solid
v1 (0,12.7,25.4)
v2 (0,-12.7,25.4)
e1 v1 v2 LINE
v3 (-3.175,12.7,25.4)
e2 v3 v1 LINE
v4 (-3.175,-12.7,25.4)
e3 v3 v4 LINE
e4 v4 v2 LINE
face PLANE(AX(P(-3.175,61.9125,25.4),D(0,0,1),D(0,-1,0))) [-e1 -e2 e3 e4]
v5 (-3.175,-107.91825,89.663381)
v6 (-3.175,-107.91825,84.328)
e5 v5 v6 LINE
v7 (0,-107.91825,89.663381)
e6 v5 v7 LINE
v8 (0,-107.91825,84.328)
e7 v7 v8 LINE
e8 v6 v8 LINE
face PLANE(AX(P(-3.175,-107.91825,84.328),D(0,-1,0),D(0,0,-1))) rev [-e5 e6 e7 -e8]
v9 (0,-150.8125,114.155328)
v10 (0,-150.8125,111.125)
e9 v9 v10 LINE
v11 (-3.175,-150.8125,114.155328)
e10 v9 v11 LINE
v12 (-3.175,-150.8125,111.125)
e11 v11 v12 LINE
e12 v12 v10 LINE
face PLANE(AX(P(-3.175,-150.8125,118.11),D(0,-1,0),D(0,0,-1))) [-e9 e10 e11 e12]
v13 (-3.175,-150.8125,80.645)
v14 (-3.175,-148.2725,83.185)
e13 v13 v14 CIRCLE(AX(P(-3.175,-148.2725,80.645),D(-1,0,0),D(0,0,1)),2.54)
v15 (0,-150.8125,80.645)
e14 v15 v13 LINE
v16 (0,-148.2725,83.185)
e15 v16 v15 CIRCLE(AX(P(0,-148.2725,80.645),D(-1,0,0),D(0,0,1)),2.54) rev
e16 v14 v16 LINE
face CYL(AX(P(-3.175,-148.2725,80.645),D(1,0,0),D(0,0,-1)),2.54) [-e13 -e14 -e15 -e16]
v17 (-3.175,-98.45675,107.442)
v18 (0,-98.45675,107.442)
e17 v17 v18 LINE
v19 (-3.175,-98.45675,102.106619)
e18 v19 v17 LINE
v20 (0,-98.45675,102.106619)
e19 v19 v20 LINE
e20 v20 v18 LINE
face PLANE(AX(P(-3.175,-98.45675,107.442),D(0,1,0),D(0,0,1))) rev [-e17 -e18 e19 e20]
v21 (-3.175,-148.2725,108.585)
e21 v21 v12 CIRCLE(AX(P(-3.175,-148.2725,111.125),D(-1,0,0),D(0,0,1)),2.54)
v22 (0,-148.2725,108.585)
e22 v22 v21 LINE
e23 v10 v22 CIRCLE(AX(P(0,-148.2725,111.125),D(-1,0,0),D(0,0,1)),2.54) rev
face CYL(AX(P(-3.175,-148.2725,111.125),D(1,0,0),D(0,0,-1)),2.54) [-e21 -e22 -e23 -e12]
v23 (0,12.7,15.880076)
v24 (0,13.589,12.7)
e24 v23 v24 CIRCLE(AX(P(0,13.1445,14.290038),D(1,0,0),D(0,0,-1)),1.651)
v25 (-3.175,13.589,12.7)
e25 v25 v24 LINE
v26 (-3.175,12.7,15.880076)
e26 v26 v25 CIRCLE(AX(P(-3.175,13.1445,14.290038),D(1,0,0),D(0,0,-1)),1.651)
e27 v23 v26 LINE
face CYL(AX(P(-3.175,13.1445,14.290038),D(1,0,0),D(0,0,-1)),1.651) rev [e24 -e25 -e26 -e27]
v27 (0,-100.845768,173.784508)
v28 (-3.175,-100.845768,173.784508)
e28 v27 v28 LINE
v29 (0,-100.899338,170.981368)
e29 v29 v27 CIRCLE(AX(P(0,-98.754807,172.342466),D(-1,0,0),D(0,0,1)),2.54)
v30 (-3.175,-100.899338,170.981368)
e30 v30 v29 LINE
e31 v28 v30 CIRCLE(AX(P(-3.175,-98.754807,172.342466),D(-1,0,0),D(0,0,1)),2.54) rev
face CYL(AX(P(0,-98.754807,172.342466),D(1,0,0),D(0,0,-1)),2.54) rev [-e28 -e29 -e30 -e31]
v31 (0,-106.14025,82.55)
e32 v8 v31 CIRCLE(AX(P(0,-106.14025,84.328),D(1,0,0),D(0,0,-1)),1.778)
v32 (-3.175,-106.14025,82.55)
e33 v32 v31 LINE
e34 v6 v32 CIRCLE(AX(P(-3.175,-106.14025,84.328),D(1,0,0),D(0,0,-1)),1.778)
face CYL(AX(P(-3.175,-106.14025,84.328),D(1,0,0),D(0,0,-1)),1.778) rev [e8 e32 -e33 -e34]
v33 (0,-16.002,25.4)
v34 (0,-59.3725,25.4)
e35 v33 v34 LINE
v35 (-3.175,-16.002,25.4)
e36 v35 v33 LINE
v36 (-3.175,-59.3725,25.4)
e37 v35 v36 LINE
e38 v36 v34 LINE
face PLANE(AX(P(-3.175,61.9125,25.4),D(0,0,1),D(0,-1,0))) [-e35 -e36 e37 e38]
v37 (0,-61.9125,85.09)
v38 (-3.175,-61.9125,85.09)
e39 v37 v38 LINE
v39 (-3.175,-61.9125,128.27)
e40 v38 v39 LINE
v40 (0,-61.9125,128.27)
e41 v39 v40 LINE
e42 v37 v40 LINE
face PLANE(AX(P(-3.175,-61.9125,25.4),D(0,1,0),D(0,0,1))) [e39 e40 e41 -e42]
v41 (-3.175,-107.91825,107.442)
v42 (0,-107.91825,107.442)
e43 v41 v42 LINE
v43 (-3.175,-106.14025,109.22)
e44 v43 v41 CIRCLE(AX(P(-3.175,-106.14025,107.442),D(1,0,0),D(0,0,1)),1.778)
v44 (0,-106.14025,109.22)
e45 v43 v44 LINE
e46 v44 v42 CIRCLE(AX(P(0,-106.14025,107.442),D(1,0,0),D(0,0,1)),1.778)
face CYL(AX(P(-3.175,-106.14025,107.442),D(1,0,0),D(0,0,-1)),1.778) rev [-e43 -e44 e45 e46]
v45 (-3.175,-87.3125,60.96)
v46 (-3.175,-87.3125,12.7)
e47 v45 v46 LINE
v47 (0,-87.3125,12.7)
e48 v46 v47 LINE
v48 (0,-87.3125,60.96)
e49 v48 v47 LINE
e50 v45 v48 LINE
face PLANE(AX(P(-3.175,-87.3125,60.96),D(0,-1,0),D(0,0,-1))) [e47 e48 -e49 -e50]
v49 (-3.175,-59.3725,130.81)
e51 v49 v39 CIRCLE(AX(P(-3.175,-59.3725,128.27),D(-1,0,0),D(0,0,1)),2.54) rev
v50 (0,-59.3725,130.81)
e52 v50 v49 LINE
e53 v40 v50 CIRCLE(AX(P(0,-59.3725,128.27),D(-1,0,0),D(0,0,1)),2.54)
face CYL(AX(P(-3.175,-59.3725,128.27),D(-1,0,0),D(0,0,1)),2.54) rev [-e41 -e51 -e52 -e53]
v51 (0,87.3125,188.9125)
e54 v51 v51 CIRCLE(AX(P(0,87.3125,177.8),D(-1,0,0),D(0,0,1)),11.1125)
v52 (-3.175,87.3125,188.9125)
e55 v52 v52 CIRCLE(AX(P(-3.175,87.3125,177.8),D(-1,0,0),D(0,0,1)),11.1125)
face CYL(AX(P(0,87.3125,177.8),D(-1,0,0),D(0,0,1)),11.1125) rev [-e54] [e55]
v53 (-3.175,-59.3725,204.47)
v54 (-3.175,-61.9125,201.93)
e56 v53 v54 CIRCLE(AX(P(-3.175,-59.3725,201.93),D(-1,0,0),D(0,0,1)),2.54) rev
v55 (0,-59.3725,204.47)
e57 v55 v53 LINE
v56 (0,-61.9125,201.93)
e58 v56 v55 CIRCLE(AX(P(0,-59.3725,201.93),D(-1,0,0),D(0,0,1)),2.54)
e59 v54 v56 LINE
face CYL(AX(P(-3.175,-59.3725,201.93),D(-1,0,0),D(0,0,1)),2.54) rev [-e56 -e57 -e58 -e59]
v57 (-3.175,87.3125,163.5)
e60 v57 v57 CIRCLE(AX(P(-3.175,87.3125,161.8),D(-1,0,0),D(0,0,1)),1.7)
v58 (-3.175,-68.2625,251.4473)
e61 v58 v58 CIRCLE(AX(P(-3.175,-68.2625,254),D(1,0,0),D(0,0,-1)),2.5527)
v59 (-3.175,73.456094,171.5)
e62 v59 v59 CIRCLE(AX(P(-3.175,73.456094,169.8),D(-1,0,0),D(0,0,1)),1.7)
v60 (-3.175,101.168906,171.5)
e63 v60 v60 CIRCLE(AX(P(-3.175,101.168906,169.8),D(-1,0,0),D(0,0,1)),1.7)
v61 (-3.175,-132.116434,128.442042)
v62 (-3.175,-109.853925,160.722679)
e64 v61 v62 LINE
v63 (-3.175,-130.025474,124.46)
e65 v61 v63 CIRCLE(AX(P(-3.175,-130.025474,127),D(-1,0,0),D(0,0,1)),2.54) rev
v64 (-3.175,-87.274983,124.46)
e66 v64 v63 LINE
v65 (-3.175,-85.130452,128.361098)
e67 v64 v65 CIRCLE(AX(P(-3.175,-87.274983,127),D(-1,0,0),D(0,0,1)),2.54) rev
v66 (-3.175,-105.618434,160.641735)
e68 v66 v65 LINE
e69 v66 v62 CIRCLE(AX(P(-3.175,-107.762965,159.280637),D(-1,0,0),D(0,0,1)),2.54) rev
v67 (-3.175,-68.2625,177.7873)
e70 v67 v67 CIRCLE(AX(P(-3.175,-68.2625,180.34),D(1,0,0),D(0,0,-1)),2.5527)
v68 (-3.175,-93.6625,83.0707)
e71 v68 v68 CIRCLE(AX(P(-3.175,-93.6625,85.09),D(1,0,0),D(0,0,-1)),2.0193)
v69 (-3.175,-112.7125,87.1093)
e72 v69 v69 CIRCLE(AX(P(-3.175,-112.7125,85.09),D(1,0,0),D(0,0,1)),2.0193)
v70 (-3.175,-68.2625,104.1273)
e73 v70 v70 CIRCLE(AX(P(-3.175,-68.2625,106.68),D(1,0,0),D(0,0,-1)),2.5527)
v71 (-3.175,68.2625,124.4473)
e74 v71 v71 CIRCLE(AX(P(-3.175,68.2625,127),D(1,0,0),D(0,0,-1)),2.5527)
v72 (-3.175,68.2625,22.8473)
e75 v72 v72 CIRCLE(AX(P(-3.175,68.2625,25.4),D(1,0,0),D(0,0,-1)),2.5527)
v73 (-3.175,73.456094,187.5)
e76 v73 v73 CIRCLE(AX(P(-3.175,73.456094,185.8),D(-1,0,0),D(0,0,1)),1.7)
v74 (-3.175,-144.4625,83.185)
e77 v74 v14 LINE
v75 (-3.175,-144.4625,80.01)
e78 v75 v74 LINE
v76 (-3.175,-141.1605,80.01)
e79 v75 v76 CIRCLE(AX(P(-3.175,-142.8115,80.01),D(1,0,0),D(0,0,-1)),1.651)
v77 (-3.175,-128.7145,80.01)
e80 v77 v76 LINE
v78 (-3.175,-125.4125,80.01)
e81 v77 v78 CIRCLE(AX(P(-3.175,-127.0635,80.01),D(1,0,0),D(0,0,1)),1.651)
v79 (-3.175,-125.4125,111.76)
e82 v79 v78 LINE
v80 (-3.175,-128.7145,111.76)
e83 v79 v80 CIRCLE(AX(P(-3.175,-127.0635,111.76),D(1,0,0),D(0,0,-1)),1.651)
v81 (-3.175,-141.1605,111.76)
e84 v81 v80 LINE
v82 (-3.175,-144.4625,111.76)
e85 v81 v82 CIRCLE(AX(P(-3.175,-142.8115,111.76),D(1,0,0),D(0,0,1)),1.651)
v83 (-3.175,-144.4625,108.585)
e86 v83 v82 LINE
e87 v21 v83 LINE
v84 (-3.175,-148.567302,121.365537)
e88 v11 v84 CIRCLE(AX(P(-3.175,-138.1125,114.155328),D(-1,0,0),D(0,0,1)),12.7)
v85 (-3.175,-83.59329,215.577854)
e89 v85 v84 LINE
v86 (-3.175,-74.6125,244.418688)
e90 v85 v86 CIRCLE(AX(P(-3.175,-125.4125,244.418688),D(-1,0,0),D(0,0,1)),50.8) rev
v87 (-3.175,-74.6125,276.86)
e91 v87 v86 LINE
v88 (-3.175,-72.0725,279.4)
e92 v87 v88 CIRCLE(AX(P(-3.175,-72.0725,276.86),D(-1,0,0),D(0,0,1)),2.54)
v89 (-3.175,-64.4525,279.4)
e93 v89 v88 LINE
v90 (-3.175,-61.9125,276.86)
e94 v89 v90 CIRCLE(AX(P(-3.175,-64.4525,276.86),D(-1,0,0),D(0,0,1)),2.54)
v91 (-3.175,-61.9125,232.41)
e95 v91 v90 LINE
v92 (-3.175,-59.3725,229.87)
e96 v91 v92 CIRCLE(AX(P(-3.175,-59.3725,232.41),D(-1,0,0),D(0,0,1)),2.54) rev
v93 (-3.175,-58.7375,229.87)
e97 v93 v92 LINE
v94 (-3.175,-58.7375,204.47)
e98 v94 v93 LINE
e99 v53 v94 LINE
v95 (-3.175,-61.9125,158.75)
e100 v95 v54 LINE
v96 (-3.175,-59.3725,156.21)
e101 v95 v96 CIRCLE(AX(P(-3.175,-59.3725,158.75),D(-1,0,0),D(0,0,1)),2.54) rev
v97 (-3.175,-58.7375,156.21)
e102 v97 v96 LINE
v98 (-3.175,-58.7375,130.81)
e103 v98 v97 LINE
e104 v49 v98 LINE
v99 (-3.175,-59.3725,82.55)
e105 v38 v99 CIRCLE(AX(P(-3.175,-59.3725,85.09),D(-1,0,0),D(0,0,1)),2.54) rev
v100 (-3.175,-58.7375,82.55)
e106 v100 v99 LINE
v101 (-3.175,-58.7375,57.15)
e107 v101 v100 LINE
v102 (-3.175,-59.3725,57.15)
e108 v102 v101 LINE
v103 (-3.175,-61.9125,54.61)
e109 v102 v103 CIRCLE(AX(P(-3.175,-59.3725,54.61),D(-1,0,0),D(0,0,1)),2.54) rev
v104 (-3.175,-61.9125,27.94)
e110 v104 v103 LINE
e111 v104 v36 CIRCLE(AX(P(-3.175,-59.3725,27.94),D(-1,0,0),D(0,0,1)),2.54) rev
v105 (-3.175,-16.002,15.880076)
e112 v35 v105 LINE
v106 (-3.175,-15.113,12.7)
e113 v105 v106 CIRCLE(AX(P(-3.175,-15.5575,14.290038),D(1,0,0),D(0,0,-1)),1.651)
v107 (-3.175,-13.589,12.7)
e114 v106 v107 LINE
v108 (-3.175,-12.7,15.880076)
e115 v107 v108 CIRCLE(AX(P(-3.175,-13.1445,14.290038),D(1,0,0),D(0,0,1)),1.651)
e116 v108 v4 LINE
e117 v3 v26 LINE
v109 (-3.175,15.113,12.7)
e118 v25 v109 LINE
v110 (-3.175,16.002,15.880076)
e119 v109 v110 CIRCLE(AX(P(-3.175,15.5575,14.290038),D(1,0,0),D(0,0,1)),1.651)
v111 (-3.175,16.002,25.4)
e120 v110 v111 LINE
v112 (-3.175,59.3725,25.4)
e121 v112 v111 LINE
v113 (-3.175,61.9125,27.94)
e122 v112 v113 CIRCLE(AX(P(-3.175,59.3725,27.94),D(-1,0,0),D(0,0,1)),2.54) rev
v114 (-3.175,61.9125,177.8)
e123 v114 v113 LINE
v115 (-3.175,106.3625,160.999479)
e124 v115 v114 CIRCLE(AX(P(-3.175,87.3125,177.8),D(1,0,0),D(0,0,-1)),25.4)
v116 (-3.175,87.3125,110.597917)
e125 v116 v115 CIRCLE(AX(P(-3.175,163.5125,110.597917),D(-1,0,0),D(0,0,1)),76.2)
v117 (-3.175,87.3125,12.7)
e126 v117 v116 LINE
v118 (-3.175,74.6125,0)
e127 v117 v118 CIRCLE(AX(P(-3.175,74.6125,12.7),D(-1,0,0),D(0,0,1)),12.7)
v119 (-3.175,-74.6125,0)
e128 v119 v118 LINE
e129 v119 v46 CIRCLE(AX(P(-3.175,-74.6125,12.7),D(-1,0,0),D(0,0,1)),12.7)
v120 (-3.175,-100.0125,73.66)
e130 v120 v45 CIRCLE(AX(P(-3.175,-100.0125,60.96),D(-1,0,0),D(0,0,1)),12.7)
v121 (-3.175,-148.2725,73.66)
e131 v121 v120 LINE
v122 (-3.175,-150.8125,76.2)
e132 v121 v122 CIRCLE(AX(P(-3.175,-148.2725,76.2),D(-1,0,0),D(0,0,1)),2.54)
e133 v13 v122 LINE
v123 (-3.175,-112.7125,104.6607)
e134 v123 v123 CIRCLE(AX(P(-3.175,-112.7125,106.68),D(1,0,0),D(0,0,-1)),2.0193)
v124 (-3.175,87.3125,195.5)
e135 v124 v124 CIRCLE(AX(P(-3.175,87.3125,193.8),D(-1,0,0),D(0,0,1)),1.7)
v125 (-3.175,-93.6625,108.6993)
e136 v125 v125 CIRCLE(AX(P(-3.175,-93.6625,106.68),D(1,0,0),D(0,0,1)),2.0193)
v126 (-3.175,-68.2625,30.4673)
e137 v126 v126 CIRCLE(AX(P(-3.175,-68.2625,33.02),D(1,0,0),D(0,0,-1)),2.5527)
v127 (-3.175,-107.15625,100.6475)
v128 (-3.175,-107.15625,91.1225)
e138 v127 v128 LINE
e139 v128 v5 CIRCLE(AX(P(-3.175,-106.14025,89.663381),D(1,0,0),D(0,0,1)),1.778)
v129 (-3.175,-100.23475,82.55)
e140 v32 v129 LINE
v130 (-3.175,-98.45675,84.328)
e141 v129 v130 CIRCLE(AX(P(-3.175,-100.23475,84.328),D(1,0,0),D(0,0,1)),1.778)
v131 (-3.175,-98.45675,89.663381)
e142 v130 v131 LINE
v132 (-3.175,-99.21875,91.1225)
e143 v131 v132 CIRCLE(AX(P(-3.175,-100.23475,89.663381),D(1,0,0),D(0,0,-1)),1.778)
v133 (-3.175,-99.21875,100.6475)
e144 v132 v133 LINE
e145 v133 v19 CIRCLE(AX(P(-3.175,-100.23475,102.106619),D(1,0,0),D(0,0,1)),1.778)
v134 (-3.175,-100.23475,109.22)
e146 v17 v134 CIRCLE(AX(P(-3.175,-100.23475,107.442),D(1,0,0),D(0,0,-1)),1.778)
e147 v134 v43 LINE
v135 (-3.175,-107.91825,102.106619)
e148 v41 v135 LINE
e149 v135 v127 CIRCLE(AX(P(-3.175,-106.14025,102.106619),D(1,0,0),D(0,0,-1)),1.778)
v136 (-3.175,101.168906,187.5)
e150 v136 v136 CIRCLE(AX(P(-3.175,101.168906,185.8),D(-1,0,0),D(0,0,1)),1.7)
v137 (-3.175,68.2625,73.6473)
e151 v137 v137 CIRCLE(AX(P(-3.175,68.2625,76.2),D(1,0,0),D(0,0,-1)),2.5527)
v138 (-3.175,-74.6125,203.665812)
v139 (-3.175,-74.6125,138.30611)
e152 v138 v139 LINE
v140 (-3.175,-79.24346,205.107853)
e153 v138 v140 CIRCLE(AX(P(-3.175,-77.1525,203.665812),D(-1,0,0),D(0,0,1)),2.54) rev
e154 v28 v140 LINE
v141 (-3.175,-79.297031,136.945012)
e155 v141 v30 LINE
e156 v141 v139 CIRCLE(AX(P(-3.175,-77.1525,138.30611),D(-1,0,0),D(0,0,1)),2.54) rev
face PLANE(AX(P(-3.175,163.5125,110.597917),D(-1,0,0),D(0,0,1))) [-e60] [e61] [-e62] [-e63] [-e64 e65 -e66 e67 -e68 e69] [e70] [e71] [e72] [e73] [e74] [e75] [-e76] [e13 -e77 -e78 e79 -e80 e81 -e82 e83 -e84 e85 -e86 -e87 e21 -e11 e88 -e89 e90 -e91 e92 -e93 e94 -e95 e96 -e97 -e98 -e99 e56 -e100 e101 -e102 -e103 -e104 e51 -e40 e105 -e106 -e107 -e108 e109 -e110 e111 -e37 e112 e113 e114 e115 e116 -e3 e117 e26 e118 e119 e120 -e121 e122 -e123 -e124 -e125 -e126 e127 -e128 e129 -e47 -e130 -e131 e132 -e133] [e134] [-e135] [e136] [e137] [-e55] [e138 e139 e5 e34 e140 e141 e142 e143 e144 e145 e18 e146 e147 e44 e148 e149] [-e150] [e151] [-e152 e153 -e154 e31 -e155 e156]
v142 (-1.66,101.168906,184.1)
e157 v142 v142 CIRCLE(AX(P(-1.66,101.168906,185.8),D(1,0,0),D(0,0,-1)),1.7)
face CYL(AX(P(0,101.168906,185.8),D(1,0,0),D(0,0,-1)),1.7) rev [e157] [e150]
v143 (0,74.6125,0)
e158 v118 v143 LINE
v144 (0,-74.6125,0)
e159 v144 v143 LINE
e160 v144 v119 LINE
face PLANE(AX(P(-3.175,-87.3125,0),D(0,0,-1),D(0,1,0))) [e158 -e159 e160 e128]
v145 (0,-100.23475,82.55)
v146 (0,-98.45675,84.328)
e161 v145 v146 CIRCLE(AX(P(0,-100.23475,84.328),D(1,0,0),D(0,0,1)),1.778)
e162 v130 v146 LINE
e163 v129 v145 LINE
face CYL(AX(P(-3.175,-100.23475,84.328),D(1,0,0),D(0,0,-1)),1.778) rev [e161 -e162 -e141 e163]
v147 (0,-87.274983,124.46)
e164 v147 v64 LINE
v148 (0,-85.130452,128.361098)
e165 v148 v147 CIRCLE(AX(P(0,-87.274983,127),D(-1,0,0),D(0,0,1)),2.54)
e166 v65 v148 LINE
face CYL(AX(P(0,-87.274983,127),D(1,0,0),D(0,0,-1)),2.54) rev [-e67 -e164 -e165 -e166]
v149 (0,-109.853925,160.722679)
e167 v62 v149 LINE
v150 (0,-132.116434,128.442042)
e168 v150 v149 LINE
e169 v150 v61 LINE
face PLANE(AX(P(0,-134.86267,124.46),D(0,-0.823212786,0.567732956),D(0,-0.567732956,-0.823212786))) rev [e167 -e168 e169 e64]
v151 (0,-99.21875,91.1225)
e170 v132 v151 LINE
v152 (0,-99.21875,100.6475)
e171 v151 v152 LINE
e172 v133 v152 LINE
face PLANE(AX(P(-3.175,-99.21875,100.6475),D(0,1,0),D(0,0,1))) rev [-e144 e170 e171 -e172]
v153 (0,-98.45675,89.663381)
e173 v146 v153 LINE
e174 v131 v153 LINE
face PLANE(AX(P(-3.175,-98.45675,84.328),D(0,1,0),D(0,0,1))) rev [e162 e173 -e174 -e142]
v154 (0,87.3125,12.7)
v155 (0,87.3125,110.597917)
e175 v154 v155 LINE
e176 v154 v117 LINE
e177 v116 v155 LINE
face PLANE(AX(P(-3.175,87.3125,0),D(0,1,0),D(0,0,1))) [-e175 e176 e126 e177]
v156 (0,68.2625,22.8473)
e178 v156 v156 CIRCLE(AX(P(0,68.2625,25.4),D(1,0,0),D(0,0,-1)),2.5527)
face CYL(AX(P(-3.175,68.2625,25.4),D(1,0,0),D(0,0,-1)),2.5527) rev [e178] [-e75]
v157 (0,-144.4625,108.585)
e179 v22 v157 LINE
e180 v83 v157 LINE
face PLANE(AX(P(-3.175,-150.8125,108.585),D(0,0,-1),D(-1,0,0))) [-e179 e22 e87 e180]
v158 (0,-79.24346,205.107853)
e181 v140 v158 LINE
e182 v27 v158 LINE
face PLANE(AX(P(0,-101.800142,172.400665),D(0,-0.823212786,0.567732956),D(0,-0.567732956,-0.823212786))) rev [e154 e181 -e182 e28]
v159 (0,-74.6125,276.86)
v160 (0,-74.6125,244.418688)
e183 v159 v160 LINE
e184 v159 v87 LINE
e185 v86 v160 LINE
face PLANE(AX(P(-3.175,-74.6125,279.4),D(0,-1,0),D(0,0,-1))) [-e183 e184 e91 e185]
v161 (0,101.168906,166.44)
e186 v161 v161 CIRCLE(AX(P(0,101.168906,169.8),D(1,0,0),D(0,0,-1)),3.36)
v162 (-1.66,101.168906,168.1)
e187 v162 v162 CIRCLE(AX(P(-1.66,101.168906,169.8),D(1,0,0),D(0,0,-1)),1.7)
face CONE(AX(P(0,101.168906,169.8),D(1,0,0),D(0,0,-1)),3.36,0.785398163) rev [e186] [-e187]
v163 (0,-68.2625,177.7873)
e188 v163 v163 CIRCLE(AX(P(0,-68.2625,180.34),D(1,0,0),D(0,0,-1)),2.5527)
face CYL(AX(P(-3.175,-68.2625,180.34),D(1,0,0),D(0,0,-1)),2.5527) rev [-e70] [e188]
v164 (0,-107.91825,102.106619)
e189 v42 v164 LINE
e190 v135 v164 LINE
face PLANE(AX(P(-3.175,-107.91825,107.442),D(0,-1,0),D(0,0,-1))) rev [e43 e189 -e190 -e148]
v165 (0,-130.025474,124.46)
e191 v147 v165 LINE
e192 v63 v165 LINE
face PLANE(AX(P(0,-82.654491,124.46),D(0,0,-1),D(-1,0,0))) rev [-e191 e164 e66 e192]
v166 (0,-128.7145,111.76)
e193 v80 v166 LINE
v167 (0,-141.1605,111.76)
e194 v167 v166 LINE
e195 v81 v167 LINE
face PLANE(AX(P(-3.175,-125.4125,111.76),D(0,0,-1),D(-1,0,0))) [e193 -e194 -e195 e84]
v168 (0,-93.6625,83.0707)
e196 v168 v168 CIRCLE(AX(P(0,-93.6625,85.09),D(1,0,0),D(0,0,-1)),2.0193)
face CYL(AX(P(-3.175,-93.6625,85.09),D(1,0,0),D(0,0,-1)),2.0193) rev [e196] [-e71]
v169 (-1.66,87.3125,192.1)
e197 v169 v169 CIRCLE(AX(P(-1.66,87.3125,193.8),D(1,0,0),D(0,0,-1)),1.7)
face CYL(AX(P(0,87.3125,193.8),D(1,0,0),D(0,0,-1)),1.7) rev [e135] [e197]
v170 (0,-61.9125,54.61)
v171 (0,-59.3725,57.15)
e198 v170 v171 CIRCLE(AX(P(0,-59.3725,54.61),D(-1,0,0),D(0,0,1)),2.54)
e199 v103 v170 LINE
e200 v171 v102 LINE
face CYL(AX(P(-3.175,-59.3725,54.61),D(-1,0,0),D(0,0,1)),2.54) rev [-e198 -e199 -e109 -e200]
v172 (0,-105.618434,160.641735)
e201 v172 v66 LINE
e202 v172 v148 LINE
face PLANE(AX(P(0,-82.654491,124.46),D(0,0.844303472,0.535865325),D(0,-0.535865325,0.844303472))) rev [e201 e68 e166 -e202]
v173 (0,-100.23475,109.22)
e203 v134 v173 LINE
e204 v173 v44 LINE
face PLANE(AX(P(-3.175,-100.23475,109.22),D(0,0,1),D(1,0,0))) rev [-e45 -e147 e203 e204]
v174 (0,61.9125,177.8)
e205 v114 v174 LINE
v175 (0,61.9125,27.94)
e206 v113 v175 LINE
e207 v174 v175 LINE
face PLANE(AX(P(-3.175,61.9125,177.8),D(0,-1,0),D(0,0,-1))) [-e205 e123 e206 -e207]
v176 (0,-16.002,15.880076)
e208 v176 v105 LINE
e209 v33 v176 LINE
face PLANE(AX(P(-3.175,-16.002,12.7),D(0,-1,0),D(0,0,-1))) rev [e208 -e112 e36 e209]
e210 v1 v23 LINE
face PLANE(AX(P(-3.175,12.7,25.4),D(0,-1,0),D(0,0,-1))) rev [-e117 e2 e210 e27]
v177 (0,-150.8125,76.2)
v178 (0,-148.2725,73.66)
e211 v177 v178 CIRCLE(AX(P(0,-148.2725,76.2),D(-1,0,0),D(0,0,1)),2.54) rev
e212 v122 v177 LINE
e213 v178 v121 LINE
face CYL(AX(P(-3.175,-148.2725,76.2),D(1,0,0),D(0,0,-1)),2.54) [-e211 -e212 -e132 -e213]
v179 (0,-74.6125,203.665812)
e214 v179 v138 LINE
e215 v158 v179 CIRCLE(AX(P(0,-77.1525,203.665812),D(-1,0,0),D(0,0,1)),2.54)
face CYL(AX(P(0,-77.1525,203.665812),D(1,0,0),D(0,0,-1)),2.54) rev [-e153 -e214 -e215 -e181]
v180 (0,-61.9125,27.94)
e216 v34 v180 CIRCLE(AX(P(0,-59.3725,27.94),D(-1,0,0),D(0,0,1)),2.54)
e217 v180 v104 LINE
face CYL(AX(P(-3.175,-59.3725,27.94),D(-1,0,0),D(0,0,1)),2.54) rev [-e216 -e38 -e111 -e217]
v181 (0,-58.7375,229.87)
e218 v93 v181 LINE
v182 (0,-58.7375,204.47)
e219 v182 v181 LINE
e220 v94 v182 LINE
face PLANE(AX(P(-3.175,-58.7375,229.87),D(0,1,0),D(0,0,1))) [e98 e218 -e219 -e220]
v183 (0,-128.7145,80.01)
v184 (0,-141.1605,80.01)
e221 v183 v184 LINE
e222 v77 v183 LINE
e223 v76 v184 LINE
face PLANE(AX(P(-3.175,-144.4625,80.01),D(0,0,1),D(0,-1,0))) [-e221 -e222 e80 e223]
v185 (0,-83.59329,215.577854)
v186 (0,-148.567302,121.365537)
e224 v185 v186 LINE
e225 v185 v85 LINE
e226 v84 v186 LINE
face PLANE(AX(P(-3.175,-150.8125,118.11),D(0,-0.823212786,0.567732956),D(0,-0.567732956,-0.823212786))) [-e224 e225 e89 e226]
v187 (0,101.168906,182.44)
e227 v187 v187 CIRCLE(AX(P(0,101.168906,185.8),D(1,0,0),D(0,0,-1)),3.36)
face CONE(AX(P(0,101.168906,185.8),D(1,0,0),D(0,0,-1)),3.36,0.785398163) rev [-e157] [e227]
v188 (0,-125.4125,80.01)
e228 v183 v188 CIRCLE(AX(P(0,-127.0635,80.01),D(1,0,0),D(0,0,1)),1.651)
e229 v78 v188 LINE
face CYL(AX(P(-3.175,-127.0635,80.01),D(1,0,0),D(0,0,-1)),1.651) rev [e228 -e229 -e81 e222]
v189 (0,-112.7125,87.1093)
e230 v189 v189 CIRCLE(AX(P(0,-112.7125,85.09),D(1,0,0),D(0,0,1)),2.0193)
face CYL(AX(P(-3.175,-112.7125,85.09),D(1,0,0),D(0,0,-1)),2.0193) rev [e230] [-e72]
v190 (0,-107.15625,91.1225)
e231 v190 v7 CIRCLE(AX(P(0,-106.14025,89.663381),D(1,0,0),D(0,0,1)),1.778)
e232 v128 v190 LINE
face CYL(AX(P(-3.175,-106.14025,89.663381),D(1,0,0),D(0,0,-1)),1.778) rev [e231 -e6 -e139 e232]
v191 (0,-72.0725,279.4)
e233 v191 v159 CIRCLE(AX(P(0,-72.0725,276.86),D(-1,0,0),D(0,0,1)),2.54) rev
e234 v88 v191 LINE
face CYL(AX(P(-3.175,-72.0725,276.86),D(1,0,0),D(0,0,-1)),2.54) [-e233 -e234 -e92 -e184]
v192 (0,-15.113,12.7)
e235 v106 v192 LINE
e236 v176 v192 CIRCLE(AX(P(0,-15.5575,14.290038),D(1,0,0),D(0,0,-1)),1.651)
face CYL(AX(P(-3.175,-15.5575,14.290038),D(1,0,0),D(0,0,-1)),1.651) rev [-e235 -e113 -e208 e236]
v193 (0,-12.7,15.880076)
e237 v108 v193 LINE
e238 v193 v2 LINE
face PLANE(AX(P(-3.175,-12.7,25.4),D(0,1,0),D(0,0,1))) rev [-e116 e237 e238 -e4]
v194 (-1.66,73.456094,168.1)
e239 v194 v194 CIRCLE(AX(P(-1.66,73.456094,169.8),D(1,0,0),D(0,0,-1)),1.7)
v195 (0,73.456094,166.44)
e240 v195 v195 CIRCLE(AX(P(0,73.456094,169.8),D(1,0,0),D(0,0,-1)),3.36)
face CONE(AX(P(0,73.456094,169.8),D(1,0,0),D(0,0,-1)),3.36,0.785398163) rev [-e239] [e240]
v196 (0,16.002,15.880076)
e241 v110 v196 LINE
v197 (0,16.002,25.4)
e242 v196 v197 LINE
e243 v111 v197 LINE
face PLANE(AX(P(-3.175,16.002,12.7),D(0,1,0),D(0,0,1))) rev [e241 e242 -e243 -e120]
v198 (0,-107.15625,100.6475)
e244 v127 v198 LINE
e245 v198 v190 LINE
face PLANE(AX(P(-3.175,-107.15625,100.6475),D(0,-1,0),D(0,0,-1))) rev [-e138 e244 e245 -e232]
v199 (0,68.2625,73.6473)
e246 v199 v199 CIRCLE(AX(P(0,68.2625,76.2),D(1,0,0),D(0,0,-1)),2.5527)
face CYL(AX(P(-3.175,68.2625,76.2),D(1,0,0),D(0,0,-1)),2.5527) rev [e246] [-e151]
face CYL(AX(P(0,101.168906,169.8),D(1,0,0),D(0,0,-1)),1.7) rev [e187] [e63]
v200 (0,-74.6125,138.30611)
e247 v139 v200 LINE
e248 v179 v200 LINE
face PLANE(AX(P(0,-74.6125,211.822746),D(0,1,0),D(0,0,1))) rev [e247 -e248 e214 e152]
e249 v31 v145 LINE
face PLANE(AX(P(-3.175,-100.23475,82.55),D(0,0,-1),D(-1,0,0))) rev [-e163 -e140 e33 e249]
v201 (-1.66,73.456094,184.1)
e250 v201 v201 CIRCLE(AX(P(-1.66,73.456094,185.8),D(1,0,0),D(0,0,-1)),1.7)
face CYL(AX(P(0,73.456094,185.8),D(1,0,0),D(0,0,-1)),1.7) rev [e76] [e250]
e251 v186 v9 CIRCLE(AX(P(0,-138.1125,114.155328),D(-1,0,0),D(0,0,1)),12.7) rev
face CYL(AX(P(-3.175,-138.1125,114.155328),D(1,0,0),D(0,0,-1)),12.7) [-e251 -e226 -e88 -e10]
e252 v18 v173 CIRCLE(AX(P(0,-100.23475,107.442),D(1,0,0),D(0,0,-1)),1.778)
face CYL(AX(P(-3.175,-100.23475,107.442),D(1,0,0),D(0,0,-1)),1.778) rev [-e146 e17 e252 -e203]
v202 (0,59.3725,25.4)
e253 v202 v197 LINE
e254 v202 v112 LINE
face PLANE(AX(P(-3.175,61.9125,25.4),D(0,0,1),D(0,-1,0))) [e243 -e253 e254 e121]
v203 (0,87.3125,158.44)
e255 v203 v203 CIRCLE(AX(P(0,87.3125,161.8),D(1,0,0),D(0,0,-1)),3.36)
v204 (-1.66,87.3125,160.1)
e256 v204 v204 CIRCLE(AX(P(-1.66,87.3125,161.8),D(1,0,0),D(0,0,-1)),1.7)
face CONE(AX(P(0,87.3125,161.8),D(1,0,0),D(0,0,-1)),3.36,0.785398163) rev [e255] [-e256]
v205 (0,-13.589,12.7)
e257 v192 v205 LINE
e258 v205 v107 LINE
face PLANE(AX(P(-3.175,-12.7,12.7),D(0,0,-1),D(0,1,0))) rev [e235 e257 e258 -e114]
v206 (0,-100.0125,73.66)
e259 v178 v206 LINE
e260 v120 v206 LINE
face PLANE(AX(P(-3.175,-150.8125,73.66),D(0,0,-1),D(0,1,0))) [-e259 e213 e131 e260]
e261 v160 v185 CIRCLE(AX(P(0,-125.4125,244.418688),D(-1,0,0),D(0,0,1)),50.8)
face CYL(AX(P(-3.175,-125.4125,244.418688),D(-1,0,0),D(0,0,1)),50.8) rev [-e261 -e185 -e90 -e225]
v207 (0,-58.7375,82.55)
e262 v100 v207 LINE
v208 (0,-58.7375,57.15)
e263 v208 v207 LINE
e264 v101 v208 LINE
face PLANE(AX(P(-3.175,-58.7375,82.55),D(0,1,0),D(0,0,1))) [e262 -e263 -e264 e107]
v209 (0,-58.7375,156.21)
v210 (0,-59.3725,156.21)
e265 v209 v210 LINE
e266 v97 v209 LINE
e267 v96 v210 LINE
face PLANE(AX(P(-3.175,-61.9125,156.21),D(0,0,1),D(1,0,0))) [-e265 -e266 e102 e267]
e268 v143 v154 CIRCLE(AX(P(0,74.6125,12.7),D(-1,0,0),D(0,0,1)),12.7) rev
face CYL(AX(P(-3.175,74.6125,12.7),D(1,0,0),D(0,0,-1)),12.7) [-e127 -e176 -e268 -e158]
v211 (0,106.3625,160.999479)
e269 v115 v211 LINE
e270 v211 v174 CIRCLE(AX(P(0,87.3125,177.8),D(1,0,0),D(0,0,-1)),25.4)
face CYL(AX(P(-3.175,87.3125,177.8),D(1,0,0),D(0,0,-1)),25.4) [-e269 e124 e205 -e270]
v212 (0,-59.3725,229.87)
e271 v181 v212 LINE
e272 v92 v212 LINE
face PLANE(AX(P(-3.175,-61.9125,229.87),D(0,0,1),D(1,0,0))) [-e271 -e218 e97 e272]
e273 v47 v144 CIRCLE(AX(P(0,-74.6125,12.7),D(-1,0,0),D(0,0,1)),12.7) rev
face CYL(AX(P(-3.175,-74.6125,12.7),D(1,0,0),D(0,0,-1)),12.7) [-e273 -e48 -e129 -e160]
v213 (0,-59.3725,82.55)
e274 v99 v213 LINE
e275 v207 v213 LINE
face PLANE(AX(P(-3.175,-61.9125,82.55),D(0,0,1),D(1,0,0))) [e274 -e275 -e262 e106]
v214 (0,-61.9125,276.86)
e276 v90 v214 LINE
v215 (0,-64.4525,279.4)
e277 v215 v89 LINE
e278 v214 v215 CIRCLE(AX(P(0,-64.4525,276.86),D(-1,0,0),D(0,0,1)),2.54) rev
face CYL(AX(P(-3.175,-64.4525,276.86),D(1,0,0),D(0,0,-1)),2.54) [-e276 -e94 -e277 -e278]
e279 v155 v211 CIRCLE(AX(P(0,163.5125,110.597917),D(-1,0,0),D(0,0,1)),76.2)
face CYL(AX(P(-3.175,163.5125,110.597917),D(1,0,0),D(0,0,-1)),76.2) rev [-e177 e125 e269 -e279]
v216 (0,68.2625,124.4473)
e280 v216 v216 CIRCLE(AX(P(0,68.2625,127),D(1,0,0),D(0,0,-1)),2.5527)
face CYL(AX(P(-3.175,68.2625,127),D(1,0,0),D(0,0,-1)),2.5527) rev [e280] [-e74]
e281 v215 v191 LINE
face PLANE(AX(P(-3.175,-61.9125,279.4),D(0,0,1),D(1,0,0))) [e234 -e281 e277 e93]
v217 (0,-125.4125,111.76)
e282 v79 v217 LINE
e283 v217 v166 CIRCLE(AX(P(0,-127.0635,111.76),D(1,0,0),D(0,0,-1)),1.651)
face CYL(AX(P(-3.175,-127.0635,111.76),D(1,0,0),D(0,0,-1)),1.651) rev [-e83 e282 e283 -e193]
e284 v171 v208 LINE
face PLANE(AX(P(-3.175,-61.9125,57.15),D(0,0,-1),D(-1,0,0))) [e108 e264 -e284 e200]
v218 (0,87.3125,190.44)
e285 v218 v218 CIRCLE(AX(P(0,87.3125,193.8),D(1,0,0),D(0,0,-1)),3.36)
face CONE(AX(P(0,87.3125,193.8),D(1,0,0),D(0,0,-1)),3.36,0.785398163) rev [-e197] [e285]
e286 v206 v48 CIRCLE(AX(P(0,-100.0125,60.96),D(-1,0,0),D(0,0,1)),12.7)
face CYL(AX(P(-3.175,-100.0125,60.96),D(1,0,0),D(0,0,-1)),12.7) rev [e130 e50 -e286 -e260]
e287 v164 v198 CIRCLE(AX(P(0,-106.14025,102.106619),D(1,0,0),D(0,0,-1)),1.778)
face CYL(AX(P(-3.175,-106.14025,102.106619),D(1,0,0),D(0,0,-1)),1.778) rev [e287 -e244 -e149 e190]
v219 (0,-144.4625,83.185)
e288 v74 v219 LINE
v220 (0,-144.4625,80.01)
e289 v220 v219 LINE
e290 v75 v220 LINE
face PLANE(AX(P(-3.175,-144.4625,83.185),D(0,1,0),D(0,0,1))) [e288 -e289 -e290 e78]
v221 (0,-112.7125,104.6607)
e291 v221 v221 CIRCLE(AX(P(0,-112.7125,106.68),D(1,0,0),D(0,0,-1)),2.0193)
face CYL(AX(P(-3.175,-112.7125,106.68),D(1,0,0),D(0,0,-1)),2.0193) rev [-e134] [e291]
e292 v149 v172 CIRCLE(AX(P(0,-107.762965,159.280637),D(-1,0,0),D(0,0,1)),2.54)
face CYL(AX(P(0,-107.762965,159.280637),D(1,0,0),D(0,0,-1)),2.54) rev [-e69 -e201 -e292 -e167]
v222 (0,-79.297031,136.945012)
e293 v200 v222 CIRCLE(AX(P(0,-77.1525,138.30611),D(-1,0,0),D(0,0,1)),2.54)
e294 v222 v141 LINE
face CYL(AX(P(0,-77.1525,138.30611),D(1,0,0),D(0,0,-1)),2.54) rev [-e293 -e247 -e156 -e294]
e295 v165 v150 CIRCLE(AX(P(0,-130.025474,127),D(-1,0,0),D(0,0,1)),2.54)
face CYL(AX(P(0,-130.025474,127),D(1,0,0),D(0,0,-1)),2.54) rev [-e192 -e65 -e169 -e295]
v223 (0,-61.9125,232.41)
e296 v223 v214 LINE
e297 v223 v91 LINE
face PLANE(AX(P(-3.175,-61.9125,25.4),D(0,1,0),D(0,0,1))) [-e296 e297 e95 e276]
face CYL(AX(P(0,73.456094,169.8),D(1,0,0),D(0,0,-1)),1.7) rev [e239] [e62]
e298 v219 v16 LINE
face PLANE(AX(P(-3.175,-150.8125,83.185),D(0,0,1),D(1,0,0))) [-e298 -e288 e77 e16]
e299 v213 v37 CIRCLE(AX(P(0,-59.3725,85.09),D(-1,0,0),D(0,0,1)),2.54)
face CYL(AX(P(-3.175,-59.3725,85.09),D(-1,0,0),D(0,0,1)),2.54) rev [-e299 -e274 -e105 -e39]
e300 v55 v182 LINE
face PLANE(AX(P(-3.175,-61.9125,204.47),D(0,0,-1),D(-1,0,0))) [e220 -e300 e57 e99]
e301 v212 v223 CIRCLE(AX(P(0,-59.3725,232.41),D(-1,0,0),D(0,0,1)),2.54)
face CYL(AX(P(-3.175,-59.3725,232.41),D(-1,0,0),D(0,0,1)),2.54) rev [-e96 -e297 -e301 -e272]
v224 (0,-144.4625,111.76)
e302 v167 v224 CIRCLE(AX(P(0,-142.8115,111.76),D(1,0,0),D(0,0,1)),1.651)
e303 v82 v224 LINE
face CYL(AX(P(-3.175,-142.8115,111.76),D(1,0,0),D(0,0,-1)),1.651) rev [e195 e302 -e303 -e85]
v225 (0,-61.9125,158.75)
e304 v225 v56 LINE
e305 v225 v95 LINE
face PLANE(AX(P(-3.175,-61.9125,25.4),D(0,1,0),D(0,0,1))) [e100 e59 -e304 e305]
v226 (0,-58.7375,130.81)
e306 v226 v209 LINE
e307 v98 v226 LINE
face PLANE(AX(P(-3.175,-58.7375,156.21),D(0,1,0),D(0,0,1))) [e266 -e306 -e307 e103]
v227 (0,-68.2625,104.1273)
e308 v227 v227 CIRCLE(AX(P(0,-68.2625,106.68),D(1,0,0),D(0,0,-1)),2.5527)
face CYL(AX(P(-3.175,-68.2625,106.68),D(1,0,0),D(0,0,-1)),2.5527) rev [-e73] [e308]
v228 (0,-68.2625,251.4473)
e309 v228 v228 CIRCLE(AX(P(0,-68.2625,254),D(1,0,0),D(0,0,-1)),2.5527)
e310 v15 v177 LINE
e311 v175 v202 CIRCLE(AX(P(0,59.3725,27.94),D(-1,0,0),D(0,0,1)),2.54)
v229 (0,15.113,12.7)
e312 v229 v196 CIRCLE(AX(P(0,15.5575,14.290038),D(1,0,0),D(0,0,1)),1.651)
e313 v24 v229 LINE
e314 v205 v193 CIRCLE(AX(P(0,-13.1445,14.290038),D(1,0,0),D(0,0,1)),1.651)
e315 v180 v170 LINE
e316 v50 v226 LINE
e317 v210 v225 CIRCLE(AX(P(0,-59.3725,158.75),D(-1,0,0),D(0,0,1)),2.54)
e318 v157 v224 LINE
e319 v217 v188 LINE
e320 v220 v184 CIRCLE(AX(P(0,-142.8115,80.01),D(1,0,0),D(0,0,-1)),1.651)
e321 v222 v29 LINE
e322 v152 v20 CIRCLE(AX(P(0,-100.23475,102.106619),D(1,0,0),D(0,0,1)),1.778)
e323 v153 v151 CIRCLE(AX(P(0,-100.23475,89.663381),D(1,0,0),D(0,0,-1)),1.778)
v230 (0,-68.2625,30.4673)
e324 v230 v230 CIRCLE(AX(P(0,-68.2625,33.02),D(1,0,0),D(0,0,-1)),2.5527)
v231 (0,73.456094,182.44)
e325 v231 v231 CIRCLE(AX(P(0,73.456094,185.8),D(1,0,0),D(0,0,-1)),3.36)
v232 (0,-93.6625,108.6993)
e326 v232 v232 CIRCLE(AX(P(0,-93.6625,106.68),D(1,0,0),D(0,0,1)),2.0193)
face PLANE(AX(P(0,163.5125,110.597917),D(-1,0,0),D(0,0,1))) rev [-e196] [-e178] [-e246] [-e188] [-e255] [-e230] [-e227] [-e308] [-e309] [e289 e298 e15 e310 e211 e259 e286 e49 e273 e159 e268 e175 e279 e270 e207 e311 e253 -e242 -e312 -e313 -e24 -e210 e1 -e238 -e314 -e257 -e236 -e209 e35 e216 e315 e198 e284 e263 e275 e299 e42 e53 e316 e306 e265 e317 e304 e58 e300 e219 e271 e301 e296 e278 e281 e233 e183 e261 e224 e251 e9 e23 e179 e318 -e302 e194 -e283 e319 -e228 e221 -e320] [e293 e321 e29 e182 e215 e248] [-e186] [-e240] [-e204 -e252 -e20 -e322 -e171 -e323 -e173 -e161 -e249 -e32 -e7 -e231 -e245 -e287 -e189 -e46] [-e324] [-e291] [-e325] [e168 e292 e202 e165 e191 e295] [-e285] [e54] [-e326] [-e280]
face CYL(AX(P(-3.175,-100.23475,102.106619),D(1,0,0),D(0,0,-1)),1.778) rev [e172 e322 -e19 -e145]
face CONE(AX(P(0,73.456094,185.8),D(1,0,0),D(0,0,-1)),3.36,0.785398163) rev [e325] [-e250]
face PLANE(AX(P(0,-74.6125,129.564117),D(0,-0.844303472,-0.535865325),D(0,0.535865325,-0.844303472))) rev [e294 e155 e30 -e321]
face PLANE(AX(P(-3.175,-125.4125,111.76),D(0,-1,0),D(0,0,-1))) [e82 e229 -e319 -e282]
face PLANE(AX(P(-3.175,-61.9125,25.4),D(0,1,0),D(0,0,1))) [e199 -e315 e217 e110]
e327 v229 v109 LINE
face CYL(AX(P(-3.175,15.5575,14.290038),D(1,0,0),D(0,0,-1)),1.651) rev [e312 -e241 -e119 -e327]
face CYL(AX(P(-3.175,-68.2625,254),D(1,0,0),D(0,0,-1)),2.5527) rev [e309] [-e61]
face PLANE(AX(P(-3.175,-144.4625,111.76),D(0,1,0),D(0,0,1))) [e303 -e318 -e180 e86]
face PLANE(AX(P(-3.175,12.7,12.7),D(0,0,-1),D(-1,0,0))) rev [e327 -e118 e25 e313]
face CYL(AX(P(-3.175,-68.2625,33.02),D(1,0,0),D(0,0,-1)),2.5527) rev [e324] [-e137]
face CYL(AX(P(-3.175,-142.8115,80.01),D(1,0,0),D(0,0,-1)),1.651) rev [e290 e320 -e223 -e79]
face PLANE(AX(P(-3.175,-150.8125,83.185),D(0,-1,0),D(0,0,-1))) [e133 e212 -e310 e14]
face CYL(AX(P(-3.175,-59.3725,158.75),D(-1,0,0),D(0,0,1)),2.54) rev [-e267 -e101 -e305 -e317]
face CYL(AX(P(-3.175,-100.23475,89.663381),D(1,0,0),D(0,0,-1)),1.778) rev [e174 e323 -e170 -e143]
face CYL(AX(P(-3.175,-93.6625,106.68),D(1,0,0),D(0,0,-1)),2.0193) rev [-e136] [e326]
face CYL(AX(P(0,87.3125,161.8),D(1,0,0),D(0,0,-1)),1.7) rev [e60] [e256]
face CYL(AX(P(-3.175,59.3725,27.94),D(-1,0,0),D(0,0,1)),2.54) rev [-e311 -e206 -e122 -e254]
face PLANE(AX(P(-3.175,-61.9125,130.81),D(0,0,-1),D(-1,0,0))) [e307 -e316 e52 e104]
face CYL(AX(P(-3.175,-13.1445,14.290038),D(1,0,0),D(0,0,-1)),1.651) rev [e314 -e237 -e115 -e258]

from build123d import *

# Parameters (mm, degrees)
BASE_FLANGE1_DEPTH           = 3.175
SKETCH8_W                    = 12.7
SKETCH8_H                    = 3.302
CUT_EXTRUDE2_DEPTH           = 318.51984313
SKETCH11_R                   = 3.175
CUT_EXTRUDE4_DEPTH           = 318.51984313
SKETCH21_R                   = 2.5527
CUT_EXTRUDE5_DEPTH           = 318.51984313
SKETCH23_W                   = 25.4
SKETCH23_H                   = 3.175
TAB1_DEPTH                   = 3.175
CSK_FOR_M3_SFHCS1_AT_2_COUNT = 2
CSK_FOR_M3_SFHCS1_AT_2_PITCH = 16
CSK_FOR_M3_SFHCS1_AT_3_COUNT = 2
CSK_FOR_M3_SFHCS1_AT_3_PITCH = 27.712812921
CSK_FOR_M3_SFHCS1_AT_4_COUNT = 2
CSK_FOR_M3_SFHCS1_AT_4_PITCH = 32
CSK_FOR_M3_SFHCS1_AT_5_COUNT = 2
CSK_FOR_M3_SFHCS1_AT_5_PITCH = 27.712812921
CSK_FOR_M3_SFHCS1_AT_6_COUNT = 2
CSK_FOR_M3_SFHCS1_AT_6_PITCH = 16
SKETCH27_R                   = 2.0193
CUT_EXTRUDE6_DEPTH           = 318.51984313
CUT_EXTRUDE8_DEPTH           = 318.51984313
FILLET2_R                    = 12.7
SKETCH29_R                   = 11.1125
CUT_EXTRUDE9_DEPTH           = 318.51984313
BREAK_CORNER1_START          = -3.175
BREAK_CORNER1_DEPTH          = 3.175
FILLET1_R                    = 2.54
FILLET4_R                    = 50.8
CUT_EXTRUDE10_DEPTH          = 318.51984313
FILLET5_R                    = 2.54


# Read off the part's stored shape, not the designer's step: Break-Corner1
# Sheet-metal steps are written as plain solids
with BuildPart() as part:
    # Sketch1 → Base-Flange1 (new body)
    with BuildSketch(Plane(origin=(0, 0, 0), x_dir=(0, 0, -1), z_dir=(1, 0, 0))):
        with BuildLine():
            Line((0, -87.3125), (0, 87.3125))
            Line((0, 87.3125), (-110.597916699, 87.3125))
            ThreePointArc((-110.597916699, 87.3125), (-137.538685062, 92.233926782), (-160.999479175, 106.3625))
            ThreePointArc((-160.999479175, 106.3625), (-201.559524406, 96.292756121), (-177.8, 61.9125))
            Line((-177.8, 61.9125), (-25.4, 61.9125))
            Line((-25.4, 61.9125), (-25.4, -61.9125))
            Line((-25.4, -61.9125), (-279.4, -61.9125))
            Line((-279.4, -61.9125), (-279.4, -74.6125))
            Line((-279.4, -74.6125), (-228.6, -74.6125))
            Line((-228.6, -74.6125), (-118.11, -150.8125))
            Line((-118.11, -150.8125), (-108.585, -150.8125))
            Line((-108.585, -150.8125), (-108.585, -144.4625))
            Line((-108.585, -144.4625), (-111.76, -144.4625))
            Line((-111.76, -144.4625), (-111.76, -125.4125))
            Line((-111.76, -125.4125), (-80.01, -125.4125))
            Line((-80.01, -125.4125), (-80.01, -144.4625))
            Line((-80.01, -144.4625), (-83.185, -144.4625))
            Line((-83.185, -144.4625), (-83.185, -150.8125))
            Line((-83.185, -150.8125), (-73.66, -150.8125))
            Line((-73.66, -150.8125), (-73.66, -100.0125))
            ThreePointArc((-73.66, -100.0125), (-69.940256121, -91.032243879), (-60.96, -87.3125))
            Line((-60.96, -87.3125), (0, -87.3125))
        make_face()
    extrude(amount=-BASE_FLANGE1_DEPTH)

    # Sketch8 → Cut-Extrude2 (cut, through all)
    with BuildSketch(Plane(origin=(0, 0, 0), x_dir=(0, 0, -1), z_dir=(1, 0, 0))):
        with Locations((-19.05, 14.351)):
            Rectangle(SKETCH8_W, SKETCH8_H)
        with Locations((-19.05, -14.351)):
            Rectangle(SKETCH8_W, SKETCH8_H)
    extrude(amount=-CUT_EXTRUDE2_DEPTH, mode=Mode.SUBTRACT)

    # Sketch11 → Cut-Extrude4 (cut, through all)
    with BuildSketch(Plane(origin=(0, 0, 0), x_dir=(0, 0, -1), z_dir=(1, 0, 0))):
        with Locations((-177.8, 87.3125)):
            Circle(SKETCH11_R)
    extrude(amount=-CUT_EXTRUDE4_DEPTH, mode=Mode.SUBTRACT)

    # Sketch21 → Cut-Extrude5 (cut, through all)
    with BuildSketch(Plane(origin=(0, 0, 0), x_dir=(0, 0, -1), z_dir=(1, 0, 0))):
        with Locations((-33.02, -68.2625)):
            Circle(SKETCH21_R)
        with Locations((-106.68, -68.2625)):
            Circle(SKETCH21_R)
        with Locations((-180.34, -68.2625)):
            Circle(SKETCH21_R)
        with Locations((-254, -68.2625)):
            Circle(SKETCH21_R)
        with Locations((-25.4, 68.2625)):
            Circle(SKETCH21_R)
        with Locations((-76.2, 68.2625)):
            Circle(SKETCH21_R)
        with Locations((-127, 68.2625)):
            Circle(SKETCH21_R)
    extrude(amount=-CUT_EXTRUDE5_DEPTH, mode=Mode.SUBTRACT)

    # Sketch23 → Tab1 (add)
    with BuildSketch(Plane(origin=(0, 0, 0), x_dir=(0, 0, -1), z_dir=(1, 0, 0))):
        with Locations((-217.17, -60.325)):
            Rectangle(SKETCH23_W, SKETCH23_H)
        with Locations((-143.51, -60.325)):
            Rectangle(SKETCH23_W, SKETCH23_H)
        with Locations((-69.85, -60.325)):
            Rectangle(SKETCH23_W, SKETCH23_H)
    extrude(amount=-TAB1_DEPTH)

    # Sketch25 → CSK for M3 SFHCS1 (revolve, cut)
    with BuildSketch(Plane(origin=(0, 87.3125, 161.8), x_dir=(0, 0, -1), z_dir=(0, 1, 0))):
        Polygon((0, 0), (0, 3.175), (1.7, 3.175), (1.7, 1.66), (3.36, 0), align=None)
    csk_for_m3_sfhcs1 = revolve(axis=Axis((6.35, 87.3125, 161.8), (-1, 0, 0)), mode=Mode.SUBTRACT)

    # CSK for M3 SFHCS1 at 2: CSK for M3 SFHCS1 ×2
    with Locations(*[Vector(0, -0.8660254037844383, 0.5000000000000007) * (i * CSK_FOR_M3_SFHCS1_AT_2_PITCH) for i in range(1, CSK_FOR_M3_SFHCS1_AT_2_COUNT)]):
        add(csk_for_m3_sfhcs1, mode=Mode.SUBTRACT)

    # CSK for M3 SFHCS1 at 3: CSK for M3 SFHCS1 ×2
    with Locations(*[Vector(0, -0.5000000000000007, 0.8660254037844384) * (i * CSK_FOR_M3_SFHCS1_AT_3_PITCH) for i in range(1, CSK_FOR_M3_SFHCS1_AT_3_COUNT)]):
        add(csk_for_m3_sfhcs1, mode=Mode.SUBTRACT)

    # CSK for M3 SFHCS1 at 4: CSK for M3 SFHCS1 ×2
    with Locations(*[(0, 0, i * CSK_FOR_M3_SFHCS1_AT_4_PITCH) for i in range(1, CSK_FOR_M3_SFHCS1_AT_4_COUNT)]):
        add(csk_for_m3_sfhcs1, mode=Mode.SUBTRACT)

    # CSK for M3 SFHCS1 at 5: CSK for M3 SFHCS1 ×2
    with Locations(*[Vector(0, 0.500000000000001, 0.866025403784438) * (i * CSK_FOR_M3_SFHCS1_AT_5_PITCH) for i in range(1, CSK_FOR_M3_SFHCS1_AT_5_COUNT)]):
        add(csk_for_m3_sfhcs1, mode=Mode.SUBTRACT)

    # CSK for M3 SFHCS1 at 6: CSK for M3 SFHCS1 ×2
    with Locations(*[Vector(0, 0.8660254037844392, 0.49999999999999917) * (i * CSK_FOR_M3_SFHCS1_AT_6_PITCH) for i in range(1, CSK_FOR_M3_SFHCS1_AT_6_COUNT)]):
        add(csk_for_m3_sfhcs1, mode=Mode.SUBTRACT)

    # Sketch27 → Cut-Extrude6 (cut, through all)
    with BuildSketch(Plane(origin=(0, 0, 0), x_dir=(0, 0, -1), z_dir=(1, 0, 0))):
        with Locations((-85.09, -93.6625)):
            Circle(SKETCH27_R)
        with Locations(Location((-85.09, -112.7125, 0), (0, 0, 180))):
            Circle(SKETCH27_R)
        with Locations((-106.68, -112.7125)):
            Circle(SKETCH27_R)
        with Locations(Location((-106.68, -93.6625, 0), (0, 0, 180))):
            Circle(SKETCH27_R)
        with BuildLine():
            Line((-107.442, -98.45675), (-102.106618912, -98.45675))
            ThreePointArc((-102.106618912, -98.45675), (-101.283564844, -98.658721447), (-100.6475, -99.21875))
            Line((-100.6475, -99.21875), (-91.1225, -99.21875))
            ThreePointArc((-91.1225, -99.21875), (-90.486435156, -98.658721447), (-89.663381088, -98.45675))
            Line((-89.663381088, -98.45675), (-84.328, -98.45675))
            ThreePointArc((-84.328, -98.45675), (-83.070764143, -98.977514143), (-82.55, -100.23475))
            Line((-82.55, -100.23475), (-82.55, -106.14025))
            ThreePointArc((-82.55, -106.14025), (-83.070764143, -107.397485857), (-84.328, -107.91825))
            Line((-84.328, -107.91825), (-89.663381088, -107.91825))
            ThreePointArc((-89.663381088, -107.91825), (-90.486435156, -107.716278553), (-91.1225, -107.15625))
            Line((-91.1225, -107.15625), (-100.6475, -107.15625))
            ThreePointArc((-100.6475, -107.15625), (-101.283564844, -107.716278553), (-102.106618912, -107.91825))
            Line((-102.106618912, -107.91825), (-107.442, -107.91825))
            ThreePointArc((-107.442, -107.91825), (-108.699235857, -107.397485857), (-109.22, -106.14025))
            Line((-109.22, -106.14025), (-109.22, -100.23475))
            ThreePointArc((-109.22, -100.23475), (-108.699235857, -98.977514143), (-107.442, -98.45675))
        make_face()
    extrude(amount=-CUT_EXTRUDE6_DEPTH, mode=Mode.SUBTRACT)

    # Sketch28 → Cut-Extrude8 (cut, through all)
    with BuildSketch(Plane(origin=(0, 0, 0), x_dir=(0, 0, -1), z_dir=(1, 0, 0))):
        with BuildLine():
            Line((-111.76, -144.4625), (-111.76, -141.1605))
            ThreePointArc((-111.76, -141.1605), (-113.411, -142.8115), (-111.76, -144.4625))
        make_face()
        with BuildLine():
            Line((-80.01, -144.4625), (-80.01, -141.1605))
            ThreePointArc((-80.01, -141.1605), (-78.359, -142.8115), (-80.01, -144.4625))
        make_face()
        with BuildLine():
            Line((-80.01, -125.4125), (-80.01, -128.7145))
            ThreePointArc((-80.01, -128.7145), (-78.359, -127.0635), (-80.01, -125.4125))
        make_face()
        with BuildLine():
            Line((-111.76, -125.4125), (-111.76, -128.7145))
            ThreePointArc((-111.76, -128.7145), (-113.411, -127.0635), (-111.76, -125.4125))
        make_face()
        with BuildLine():
            ThreePointArc((-15.41705117, -14.351), (-14.290037971, -17.2085), (-13.163024773, -14.351))
            ThreePointArc((-13.163024773, -14.351), (-14.290037971, -11.4935), (-15.41705117, -14.351))
        make_face()
        with BuildLine():
            ThreePointArc((-15.41705117, 14.351), (-14.290037971, 11.4935), (-13.163024773, 14.351))
            ThreePointArc((-13.163024773, 14.351), (-14.290037971, 17.2085), (-15.41705117, 14.351))
        make_face()
    extrude(amount=-CUT_EXTRUDE8_DEPTH, mode=Mode.SUBTRACT)

    # Fillet2
    fillet2_edges = [part.edges().sort_by_distance(p)[0] for p in [
        (-1.5875, -87.3125, 0),
        (-1.5875, -150.8125, 118.11),
    ]]
    fillet(fillet2_edges, radius=FILLET2_R)

    # Sketch29 → Cut-Extrude9 (cut, through all)
    with BuildSketch(Plane.ZY.offset(3.175)):
        with Locations((177.8, 87.3125)):
            Circle(SKETCH29_R)
    extrude(amount=-CUT_EXTRUDE9_DEPTH, mode=Mode.SUBTRACT)

    # Break-Corner1 outline → Break-Corner1 (cut)
    with BuildSketch(Plane.YZ.offset(BREAK_CORNER1_START)):
        with BuildLine():
            ThreePointArc((87.3125, 12.7), (83.592756121, 3.719743879), (74.6125, 0))
            Line((74.6125, 0), (87.3125, 0))
            Line((87.3125, 0), (87.3125, 12.7))
        make_face()
    extrude(amount=BREAK_CORNER1_DEPTH, mode=Mode.SUBTRACT)

    # Fillet1
    fillet1_edges = [part.edges().sort_by_distance(p)[0] for p in [
        (-1.5875, -61.9125, 229.87),
        (-1.5875, -61.9125, 204.47),
        (-1.5875, -61.9125, 156.21),
        (-1.5875, -61.9125, 130.81),
        (-1.5875, -61.9125, 82.55),
        (-1.5875, -61.9125, 57.15),
        (-1.5875, -150.8125, 73.66),
        (-1.5875, -150.8125, 83.185),
        (-1.5875, -150.8125, 108.585),
        (-1.5875, -74.6125, 279.4),
        (-1.5875, -61.9125, 279.4),
        (-1.5875, -61.9125, 25.4),
        (-1.5875, 61.9125, 25.4),
    ]]
    fillet(fillet1_edges, radius=FILLET1_R)

    # Fillet4
    fillet4_edges = [part.edges().sort_by_distance(p)[0] for p in [
        (-1.5875, -74.6125, 228.6),
    ]]
    fillet(fillet4_edges, radius=FILLET4_R)

    # Sketch30 → Cut-Extrude10 (cut, through all)
    with BuildSketch(Plane.ZY.offset(3.175)):
        Polygon((124.46, -134.86266966), (163.882081016, -107.67502758), (124.46, -82.654490572), align=None)
        Polygon((211.822746006, -74.6125), (129.564117224, -74.6125), (172.400664991, -101.80014208), align=None)
    extrude(amount=-CUT_EXTRUDE10_DEPTH, mode=Mode.SUBTRACT)

    # Fillet5
    fillet5_edges = [part.edges().sort_by_distance(p)[0] for p in [
        (-1.5875, -74.6125, 211.822746006),
        (-1.5875, -101.80014208, 172.400664991),
        (-1.5875, -74.6125, 129.564117224),
        (-1.5875, -134.86266966, 124.46),
        (-1.5875, -82.654490572, 124.46),
        (-1.5875, -107.67502758, 163.882081016),
    ]]
    fillet(fillet5_edges, radius=FILLET5_R)


solid = part.part
